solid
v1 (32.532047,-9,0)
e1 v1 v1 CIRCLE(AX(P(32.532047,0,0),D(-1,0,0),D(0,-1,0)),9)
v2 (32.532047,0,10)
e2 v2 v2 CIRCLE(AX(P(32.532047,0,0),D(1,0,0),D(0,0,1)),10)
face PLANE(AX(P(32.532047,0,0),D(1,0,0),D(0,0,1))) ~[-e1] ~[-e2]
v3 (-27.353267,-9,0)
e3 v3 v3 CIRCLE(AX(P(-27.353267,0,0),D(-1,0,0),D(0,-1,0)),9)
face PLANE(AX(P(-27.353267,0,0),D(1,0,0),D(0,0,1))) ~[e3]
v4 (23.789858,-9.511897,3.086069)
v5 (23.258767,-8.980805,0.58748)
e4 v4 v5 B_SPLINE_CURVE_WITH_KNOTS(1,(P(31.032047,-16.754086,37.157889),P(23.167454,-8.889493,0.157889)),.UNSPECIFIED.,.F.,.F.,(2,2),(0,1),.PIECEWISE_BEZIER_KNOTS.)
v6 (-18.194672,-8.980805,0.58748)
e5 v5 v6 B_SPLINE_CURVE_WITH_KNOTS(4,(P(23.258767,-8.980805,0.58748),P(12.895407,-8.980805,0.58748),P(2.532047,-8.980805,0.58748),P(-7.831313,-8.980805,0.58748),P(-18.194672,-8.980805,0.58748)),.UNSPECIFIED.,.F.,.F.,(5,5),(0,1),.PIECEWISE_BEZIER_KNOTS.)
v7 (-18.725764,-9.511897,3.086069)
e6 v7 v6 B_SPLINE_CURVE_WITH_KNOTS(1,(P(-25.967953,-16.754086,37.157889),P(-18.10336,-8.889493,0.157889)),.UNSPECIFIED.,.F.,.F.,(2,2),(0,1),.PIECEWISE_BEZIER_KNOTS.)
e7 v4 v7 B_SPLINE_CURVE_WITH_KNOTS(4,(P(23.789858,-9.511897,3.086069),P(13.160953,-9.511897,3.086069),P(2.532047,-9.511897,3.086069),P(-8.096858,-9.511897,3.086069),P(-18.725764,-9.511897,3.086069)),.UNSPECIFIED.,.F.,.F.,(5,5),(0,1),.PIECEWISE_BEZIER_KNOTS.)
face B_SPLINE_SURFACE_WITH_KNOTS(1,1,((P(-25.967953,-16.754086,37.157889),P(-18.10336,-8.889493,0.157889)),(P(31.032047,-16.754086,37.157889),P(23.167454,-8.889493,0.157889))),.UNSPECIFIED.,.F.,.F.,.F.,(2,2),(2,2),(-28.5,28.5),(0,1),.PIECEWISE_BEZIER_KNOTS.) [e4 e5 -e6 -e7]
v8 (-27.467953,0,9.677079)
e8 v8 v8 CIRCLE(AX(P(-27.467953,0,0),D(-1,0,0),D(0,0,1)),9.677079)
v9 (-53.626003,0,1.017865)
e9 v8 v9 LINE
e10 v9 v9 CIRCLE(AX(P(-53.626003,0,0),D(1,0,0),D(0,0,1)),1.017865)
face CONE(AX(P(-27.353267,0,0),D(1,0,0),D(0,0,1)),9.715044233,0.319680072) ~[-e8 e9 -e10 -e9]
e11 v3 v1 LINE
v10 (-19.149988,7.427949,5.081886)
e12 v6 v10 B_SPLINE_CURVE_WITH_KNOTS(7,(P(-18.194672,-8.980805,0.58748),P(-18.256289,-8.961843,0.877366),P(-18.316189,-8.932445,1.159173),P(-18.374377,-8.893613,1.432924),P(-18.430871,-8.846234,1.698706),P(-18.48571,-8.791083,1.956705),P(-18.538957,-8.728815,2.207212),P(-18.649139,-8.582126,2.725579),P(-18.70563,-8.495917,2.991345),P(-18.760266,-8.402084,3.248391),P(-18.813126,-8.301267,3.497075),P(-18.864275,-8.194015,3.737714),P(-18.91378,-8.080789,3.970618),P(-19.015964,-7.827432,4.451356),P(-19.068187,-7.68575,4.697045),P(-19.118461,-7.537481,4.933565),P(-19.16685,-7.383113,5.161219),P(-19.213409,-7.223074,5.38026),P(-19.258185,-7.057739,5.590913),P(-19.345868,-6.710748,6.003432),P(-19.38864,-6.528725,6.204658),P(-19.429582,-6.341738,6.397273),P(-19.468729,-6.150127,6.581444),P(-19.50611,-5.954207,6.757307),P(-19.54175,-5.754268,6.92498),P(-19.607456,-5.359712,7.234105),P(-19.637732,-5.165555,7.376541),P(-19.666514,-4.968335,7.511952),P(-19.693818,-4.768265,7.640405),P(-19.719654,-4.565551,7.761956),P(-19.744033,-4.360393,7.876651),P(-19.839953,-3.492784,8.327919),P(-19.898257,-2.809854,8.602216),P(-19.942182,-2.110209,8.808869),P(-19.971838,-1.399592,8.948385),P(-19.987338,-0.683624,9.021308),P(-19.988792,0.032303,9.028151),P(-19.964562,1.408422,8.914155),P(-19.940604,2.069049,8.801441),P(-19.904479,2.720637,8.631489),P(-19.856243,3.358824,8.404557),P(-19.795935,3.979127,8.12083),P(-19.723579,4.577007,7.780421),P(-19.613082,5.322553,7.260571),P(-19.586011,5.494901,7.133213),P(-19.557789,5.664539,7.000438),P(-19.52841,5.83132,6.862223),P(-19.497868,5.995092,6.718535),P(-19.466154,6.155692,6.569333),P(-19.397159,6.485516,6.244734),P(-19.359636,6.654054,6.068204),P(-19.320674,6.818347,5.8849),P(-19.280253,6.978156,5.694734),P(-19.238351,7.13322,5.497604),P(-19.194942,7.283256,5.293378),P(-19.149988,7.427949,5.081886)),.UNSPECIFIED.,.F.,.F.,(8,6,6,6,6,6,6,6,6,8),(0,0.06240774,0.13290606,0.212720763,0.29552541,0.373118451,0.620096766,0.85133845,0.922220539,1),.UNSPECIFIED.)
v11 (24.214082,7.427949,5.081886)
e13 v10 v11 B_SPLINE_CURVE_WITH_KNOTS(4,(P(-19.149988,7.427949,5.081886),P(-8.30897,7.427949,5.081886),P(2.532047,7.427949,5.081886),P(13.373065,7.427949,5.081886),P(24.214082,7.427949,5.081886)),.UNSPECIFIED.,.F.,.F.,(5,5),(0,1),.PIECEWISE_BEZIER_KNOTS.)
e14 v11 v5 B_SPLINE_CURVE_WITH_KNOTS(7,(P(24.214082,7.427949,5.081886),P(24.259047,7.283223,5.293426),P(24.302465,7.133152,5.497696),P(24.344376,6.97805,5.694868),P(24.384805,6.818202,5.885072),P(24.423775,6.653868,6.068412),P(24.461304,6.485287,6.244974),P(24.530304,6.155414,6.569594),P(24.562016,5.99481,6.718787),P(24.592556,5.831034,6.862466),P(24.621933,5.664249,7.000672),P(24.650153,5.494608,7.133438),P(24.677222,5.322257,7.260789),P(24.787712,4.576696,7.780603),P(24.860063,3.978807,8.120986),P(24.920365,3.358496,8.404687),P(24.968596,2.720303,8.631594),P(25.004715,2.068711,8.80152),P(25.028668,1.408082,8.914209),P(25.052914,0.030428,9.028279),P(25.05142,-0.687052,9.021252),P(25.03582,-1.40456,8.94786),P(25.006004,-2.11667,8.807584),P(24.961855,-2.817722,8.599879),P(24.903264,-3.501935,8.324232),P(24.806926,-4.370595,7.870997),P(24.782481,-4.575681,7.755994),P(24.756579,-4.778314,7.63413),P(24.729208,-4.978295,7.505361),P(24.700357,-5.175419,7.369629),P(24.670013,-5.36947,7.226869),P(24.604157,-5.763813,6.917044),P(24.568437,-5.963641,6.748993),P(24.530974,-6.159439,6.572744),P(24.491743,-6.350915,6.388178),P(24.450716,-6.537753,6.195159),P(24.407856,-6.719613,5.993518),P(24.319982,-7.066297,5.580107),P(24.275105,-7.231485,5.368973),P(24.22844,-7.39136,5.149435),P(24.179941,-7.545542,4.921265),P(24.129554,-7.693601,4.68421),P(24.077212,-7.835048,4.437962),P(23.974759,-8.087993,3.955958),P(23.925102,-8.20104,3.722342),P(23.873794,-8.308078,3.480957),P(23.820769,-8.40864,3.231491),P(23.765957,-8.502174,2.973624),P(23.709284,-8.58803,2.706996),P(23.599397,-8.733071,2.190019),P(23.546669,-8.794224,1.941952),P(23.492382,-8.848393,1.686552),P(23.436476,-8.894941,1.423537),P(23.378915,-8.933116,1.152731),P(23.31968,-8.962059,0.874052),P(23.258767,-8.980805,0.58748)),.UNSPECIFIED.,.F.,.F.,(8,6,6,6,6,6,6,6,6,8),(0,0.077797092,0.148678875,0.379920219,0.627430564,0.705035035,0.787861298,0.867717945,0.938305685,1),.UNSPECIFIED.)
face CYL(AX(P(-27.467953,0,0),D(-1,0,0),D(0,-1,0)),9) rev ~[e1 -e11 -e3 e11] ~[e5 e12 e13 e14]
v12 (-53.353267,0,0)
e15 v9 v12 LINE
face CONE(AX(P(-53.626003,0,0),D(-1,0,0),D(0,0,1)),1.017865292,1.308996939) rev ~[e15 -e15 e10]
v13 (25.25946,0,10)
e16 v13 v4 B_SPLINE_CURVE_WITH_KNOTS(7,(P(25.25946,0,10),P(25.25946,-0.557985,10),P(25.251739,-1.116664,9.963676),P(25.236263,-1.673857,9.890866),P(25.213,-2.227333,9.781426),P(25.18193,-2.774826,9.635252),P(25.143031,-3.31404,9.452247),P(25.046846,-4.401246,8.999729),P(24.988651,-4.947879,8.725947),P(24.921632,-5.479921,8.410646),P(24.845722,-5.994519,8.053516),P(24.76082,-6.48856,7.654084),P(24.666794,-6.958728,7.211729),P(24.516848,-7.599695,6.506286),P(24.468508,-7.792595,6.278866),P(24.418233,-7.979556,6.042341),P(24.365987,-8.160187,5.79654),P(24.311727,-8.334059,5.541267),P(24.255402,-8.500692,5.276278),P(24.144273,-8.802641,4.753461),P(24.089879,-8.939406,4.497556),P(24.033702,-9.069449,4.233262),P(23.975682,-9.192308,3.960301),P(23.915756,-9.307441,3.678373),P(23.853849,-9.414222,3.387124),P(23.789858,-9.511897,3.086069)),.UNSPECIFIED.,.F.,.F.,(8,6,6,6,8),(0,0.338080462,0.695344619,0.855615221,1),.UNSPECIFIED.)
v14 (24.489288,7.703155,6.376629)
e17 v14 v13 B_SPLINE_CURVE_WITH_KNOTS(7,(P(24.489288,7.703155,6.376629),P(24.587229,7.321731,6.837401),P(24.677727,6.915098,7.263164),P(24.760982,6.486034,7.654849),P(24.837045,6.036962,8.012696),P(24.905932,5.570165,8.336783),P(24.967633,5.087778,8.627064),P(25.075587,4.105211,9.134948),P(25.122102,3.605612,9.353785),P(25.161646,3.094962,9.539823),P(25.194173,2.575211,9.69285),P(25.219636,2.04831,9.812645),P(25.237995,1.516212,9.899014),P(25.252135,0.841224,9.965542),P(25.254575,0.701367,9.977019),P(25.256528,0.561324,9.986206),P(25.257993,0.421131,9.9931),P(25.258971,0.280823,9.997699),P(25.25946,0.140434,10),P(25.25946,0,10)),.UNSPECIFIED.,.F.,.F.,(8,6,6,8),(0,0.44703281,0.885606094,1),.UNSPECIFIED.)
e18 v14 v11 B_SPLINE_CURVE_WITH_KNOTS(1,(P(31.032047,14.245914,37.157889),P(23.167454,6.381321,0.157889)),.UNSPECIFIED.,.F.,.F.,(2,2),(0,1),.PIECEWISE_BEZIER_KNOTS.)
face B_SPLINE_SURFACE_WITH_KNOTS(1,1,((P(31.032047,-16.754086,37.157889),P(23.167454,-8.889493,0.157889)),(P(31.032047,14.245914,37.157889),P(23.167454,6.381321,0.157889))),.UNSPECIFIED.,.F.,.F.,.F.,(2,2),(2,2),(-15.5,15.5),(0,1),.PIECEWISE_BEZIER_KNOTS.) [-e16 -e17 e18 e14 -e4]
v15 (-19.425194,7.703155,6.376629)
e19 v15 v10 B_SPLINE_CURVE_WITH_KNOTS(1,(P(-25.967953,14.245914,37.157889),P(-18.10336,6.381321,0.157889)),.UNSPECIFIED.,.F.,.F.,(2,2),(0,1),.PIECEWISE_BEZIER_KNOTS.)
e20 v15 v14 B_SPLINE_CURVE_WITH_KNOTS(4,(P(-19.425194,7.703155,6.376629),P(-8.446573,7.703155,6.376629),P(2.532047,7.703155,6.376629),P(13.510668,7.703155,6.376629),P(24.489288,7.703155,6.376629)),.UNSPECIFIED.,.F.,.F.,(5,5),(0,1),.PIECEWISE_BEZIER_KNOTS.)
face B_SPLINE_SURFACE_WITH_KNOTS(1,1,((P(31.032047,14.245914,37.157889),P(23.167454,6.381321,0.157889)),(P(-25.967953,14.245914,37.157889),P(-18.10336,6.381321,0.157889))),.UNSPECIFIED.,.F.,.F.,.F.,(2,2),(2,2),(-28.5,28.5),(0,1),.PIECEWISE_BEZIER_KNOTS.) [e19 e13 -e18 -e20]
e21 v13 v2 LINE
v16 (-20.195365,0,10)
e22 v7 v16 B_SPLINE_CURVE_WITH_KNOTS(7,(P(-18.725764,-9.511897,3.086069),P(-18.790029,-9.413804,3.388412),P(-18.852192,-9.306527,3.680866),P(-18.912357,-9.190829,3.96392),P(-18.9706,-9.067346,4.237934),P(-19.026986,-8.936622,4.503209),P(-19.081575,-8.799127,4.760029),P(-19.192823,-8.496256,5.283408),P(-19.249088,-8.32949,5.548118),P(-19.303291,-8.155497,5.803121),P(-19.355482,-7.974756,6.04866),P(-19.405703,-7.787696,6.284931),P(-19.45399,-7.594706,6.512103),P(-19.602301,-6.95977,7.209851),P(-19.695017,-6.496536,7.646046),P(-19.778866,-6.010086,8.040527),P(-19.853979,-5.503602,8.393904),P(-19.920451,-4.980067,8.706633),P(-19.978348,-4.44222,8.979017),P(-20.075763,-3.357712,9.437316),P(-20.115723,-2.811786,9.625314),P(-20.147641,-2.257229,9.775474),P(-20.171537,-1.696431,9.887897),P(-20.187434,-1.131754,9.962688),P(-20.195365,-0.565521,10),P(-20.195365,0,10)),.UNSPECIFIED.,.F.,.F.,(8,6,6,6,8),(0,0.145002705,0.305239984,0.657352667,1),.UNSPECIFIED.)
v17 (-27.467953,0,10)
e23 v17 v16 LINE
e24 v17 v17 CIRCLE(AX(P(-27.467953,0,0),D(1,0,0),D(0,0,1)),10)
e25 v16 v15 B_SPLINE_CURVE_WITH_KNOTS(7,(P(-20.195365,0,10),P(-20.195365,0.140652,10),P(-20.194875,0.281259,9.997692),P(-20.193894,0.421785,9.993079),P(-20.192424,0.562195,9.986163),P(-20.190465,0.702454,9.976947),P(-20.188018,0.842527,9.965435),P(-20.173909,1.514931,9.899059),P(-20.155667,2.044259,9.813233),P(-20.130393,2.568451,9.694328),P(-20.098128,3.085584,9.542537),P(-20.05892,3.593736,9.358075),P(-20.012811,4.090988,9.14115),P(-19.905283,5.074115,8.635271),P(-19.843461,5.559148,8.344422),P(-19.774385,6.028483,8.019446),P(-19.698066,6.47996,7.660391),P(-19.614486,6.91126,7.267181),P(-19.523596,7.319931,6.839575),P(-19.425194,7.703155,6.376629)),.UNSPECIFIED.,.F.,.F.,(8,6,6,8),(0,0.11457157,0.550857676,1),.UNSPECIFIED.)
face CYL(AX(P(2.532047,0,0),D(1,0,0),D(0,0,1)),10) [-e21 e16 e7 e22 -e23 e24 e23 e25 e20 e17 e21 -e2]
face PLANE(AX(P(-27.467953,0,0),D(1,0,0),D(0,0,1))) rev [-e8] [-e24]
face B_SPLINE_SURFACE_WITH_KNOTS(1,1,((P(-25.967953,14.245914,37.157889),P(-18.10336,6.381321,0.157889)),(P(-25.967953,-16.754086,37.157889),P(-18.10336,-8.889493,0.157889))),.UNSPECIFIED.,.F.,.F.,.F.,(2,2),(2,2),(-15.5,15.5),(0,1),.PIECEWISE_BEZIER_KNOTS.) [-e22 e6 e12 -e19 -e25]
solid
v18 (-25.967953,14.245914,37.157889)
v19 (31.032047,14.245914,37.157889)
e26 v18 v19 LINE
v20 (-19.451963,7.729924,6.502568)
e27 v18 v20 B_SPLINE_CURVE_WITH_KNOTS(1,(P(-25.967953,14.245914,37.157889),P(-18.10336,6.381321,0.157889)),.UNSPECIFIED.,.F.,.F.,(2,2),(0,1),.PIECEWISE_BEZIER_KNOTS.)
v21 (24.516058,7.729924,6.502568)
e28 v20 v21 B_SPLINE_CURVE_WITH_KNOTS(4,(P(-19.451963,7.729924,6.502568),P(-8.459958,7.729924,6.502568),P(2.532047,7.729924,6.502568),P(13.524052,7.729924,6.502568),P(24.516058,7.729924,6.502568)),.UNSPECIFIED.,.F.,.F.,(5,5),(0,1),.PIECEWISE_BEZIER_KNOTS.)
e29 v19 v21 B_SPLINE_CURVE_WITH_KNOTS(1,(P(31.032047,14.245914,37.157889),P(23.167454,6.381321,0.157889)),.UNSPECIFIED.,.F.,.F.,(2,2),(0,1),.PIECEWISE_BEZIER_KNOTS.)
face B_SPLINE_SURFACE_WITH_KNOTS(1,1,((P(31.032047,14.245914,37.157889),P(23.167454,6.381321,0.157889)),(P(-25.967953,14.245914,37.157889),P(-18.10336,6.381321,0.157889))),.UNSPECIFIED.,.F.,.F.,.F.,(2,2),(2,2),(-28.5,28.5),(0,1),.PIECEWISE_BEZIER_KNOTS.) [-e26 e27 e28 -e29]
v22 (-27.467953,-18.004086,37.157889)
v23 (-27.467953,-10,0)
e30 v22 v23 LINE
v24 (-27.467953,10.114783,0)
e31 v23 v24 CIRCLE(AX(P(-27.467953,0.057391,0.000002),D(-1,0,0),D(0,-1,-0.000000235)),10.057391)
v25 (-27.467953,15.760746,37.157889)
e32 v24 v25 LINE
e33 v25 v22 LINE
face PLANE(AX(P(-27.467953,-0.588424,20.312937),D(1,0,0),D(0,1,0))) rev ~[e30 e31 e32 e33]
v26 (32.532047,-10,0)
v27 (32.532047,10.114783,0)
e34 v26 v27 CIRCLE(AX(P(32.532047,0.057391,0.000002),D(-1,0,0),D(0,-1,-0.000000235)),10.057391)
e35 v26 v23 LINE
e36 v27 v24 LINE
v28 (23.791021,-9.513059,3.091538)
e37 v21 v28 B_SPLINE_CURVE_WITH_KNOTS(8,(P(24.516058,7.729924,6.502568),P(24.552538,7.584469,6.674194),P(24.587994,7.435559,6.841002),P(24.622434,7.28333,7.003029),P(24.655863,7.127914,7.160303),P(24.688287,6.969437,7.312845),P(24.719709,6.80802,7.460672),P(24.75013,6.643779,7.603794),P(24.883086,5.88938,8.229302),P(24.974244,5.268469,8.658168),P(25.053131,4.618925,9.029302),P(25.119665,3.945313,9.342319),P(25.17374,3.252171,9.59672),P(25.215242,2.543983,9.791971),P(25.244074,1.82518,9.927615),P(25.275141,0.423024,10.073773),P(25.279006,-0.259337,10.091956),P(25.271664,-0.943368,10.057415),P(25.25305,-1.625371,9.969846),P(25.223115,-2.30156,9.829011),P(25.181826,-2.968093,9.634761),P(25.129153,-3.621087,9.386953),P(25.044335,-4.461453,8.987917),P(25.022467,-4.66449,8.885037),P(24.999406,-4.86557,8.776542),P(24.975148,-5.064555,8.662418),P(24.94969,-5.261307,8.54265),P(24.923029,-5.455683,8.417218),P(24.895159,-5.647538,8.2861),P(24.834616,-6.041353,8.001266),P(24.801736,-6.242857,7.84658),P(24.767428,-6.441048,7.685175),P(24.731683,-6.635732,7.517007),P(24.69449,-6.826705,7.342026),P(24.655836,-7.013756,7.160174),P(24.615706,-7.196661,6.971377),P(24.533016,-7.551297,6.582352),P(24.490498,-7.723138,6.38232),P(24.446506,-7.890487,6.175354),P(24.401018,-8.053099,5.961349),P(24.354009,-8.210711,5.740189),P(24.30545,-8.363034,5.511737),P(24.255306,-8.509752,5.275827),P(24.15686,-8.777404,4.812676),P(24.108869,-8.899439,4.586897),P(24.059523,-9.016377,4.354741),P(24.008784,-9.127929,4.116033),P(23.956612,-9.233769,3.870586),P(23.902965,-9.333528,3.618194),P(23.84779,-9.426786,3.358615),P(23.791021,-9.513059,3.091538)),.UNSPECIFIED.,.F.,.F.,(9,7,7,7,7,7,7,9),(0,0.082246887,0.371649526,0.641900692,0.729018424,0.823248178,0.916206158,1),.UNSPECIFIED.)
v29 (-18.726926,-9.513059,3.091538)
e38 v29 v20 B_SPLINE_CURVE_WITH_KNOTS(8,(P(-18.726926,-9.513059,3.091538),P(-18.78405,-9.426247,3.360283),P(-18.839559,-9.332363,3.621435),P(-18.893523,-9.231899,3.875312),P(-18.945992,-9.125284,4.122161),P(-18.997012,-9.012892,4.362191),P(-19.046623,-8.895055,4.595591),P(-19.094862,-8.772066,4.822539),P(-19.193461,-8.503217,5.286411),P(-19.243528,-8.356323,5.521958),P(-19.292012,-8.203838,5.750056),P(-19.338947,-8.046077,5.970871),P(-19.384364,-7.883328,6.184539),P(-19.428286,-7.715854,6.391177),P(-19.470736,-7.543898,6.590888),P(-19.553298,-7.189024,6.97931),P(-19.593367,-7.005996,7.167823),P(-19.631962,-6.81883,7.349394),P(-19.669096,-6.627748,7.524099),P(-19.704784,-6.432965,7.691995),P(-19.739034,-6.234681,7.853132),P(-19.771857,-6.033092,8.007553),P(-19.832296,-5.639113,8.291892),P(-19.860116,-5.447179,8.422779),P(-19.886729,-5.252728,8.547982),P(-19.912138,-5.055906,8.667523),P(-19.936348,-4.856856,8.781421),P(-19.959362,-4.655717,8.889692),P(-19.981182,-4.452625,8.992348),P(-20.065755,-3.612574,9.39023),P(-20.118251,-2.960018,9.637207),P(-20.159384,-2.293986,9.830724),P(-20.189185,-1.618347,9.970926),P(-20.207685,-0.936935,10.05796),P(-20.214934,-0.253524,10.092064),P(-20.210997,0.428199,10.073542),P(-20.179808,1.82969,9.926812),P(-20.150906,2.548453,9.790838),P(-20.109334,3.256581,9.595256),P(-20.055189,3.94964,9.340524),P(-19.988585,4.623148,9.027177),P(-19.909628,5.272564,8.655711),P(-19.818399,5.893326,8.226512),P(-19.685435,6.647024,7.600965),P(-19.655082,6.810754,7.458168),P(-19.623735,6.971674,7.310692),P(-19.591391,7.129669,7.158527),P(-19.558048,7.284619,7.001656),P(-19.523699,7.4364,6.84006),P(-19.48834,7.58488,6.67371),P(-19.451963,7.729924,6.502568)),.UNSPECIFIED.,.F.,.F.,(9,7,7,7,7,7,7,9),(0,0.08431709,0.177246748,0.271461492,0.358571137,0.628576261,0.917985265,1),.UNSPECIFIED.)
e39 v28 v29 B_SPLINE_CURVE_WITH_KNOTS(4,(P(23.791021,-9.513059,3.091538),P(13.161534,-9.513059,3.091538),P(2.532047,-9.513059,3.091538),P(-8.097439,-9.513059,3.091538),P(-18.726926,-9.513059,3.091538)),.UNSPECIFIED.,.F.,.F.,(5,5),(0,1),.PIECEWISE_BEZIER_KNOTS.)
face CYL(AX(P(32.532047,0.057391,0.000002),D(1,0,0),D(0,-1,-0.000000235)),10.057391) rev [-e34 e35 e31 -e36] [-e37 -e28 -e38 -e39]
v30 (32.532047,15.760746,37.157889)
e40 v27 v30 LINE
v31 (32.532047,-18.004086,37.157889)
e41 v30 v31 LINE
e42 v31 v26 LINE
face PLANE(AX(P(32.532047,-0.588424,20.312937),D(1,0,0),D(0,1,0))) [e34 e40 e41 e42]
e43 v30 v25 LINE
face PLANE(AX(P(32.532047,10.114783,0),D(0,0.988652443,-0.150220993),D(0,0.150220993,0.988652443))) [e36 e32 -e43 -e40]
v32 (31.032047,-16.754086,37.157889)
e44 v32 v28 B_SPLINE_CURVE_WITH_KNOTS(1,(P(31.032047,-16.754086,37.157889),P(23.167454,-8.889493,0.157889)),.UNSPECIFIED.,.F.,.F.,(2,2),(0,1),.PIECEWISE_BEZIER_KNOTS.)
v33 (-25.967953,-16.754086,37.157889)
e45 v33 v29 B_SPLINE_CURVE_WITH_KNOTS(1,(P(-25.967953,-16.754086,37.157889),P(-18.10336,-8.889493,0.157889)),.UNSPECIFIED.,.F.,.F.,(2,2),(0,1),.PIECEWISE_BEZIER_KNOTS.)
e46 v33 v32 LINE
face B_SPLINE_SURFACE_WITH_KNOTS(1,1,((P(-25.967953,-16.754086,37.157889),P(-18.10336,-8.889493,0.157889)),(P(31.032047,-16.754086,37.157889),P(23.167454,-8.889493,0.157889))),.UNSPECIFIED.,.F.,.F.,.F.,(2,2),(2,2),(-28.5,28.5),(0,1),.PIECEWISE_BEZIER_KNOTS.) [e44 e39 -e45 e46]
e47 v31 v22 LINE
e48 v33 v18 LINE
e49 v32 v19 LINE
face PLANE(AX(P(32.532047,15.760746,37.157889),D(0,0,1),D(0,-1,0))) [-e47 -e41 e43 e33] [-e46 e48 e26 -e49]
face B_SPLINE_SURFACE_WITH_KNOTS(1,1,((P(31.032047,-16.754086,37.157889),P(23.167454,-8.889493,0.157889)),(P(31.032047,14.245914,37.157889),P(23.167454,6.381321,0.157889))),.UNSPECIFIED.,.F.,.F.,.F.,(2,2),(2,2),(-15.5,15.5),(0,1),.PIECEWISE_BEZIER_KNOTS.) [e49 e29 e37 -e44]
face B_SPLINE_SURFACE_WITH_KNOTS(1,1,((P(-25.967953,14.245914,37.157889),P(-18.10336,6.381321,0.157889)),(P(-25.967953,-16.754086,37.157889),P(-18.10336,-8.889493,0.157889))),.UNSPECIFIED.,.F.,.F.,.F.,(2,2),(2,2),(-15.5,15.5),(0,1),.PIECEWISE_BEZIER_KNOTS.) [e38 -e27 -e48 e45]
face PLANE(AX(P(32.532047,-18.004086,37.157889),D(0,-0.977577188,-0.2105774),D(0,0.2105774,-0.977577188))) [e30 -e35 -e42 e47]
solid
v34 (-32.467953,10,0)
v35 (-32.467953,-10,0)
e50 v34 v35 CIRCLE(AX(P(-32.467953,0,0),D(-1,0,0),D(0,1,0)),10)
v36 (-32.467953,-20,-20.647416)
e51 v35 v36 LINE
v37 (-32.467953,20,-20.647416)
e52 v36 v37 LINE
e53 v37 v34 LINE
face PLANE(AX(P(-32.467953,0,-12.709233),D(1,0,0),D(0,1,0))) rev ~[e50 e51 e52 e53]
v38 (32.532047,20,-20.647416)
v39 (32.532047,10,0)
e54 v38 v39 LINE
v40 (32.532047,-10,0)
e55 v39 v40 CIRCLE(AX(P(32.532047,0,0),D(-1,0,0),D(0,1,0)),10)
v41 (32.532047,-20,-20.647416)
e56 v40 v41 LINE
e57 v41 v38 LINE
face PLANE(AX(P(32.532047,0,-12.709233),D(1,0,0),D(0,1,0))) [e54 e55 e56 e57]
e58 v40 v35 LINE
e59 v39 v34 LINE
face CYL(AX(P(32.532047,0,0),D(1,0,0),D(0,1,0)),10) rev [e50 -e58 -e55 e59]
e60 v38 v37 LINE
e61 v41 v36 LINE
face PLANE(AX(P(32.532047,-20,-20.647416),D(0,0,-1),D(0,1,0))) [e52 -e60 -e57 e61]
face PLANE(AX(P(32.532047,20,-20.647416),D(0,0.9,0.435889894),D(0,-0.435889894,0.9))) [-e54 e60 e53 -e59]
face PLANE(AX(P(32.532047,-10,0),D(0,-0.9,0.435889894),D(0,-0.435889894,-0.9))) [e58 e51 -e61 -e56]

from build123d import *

# Parameters (mm, degrees)
F0_W      = 60
F0_H      = 10
F2_R      = 9
F3_DEPTH  = 60
F7_DEPTH  = 60
F8_W      = 57
F8_H      = 31
F9_DEPTH  = 37
F9_TAPER  = 12
F11_DEPTH = 65


# Not quite as in the source:
# - ends of sketch curves that miss each other by under 0.0002 mm in the source are joined


with BuildPart() as f1:
    # F0 (on Front) → F1 (revolve)
    with BuildSketch(Plane.XZ):
        with Locations((2.5320472605, 5)):
            Rectangle(F0_W, F0_H)
    revolve(axis=Axis((2.5320472605, 0, 0), (1, 0, 0)))

    # F2 (on face) → F3 (cut)
    with BuildSketch(Plane(origin=(-27.4679527395, 0, 0), x_dir=(0, -1, 0), z_dir=(-1, 0, 0))):
        Circle(F2_R)
    extrude(amount=-F3_DEPTH, mode=Mode.SUBTRACT)

    # F4 (on Front) → F5 (revolve)
    with BuildSketch(Plane.XZ):
        Polygon((-27.3532667905, 0), (-27.3532667905, 9.7150442334), (-53.6260029736, 1.0178652923), (-53.3532667905, 0), align=None)
    revolve(axis=Axis((2.5320472605, 0, 0), (1, 0, 0)))


with BuildPart() as f7:
    # F6 (on face) → F7 (new body)
    with BuildSketch(Plane.YZ.offset(32.5320472605)):
        with BuildLine():
            Line((-18.0040858686, 37.1578894556), (-10, 0))
            ThreePointArc((-10, 0), (0.0573891046, 10.0573938269), (10.1147829316, 0))
            Line((10.1147829316, 0), (15.7607458532, 37.1578894556))
            Line((15.7607458532, 37.1578894556), (-18.0040858686, 37.1578894556))
        make_face()
    extrude(amount=-F7_DEPTH)


with BuildPart() as f9_tool:
    # F8 (on face) → F9 (new body)
    with BuildSketch(Plane.XY.offset(37.1578894556)):
        with Locations((2.5320472605, -1.2540858686)):
            Rectangle(F8_W, F8_H)
    extrude(amount=-F9_DEPTH, taper=F9_TAPER)


with BuildPart() as f1_1:
    add(f1.part)

    # F9: cut by f9_tool
    add(f9_tool.part, mode=Mode.SUBTRACT)


with BuildPart() as f7_1:
    add(f7.part)

    # F9: cut by f9_tool
    add(f9_tool.part, mode=Mode.SUBTRACT)


with BuildPart() as f11:
    # F10 (on face) → F11 (new body)
    with BuildSketch(Plane.YZ.offset(32.5320472605)):
        with BuildLine():
            ThreePointArc((10, 0), (0, -10), (-10, 0))
            Line((-10, 0), (-20, -20.6474160484))
            Line((-20, -20.6474160484), (20, -20.6474160484))
            Line((20, -20.6474160484), (10, 0))
        make_face()
    extrude(amount=-F11_DEPTH)


solid = Compound([f1_1.part, f7_1.part, f11.part])
